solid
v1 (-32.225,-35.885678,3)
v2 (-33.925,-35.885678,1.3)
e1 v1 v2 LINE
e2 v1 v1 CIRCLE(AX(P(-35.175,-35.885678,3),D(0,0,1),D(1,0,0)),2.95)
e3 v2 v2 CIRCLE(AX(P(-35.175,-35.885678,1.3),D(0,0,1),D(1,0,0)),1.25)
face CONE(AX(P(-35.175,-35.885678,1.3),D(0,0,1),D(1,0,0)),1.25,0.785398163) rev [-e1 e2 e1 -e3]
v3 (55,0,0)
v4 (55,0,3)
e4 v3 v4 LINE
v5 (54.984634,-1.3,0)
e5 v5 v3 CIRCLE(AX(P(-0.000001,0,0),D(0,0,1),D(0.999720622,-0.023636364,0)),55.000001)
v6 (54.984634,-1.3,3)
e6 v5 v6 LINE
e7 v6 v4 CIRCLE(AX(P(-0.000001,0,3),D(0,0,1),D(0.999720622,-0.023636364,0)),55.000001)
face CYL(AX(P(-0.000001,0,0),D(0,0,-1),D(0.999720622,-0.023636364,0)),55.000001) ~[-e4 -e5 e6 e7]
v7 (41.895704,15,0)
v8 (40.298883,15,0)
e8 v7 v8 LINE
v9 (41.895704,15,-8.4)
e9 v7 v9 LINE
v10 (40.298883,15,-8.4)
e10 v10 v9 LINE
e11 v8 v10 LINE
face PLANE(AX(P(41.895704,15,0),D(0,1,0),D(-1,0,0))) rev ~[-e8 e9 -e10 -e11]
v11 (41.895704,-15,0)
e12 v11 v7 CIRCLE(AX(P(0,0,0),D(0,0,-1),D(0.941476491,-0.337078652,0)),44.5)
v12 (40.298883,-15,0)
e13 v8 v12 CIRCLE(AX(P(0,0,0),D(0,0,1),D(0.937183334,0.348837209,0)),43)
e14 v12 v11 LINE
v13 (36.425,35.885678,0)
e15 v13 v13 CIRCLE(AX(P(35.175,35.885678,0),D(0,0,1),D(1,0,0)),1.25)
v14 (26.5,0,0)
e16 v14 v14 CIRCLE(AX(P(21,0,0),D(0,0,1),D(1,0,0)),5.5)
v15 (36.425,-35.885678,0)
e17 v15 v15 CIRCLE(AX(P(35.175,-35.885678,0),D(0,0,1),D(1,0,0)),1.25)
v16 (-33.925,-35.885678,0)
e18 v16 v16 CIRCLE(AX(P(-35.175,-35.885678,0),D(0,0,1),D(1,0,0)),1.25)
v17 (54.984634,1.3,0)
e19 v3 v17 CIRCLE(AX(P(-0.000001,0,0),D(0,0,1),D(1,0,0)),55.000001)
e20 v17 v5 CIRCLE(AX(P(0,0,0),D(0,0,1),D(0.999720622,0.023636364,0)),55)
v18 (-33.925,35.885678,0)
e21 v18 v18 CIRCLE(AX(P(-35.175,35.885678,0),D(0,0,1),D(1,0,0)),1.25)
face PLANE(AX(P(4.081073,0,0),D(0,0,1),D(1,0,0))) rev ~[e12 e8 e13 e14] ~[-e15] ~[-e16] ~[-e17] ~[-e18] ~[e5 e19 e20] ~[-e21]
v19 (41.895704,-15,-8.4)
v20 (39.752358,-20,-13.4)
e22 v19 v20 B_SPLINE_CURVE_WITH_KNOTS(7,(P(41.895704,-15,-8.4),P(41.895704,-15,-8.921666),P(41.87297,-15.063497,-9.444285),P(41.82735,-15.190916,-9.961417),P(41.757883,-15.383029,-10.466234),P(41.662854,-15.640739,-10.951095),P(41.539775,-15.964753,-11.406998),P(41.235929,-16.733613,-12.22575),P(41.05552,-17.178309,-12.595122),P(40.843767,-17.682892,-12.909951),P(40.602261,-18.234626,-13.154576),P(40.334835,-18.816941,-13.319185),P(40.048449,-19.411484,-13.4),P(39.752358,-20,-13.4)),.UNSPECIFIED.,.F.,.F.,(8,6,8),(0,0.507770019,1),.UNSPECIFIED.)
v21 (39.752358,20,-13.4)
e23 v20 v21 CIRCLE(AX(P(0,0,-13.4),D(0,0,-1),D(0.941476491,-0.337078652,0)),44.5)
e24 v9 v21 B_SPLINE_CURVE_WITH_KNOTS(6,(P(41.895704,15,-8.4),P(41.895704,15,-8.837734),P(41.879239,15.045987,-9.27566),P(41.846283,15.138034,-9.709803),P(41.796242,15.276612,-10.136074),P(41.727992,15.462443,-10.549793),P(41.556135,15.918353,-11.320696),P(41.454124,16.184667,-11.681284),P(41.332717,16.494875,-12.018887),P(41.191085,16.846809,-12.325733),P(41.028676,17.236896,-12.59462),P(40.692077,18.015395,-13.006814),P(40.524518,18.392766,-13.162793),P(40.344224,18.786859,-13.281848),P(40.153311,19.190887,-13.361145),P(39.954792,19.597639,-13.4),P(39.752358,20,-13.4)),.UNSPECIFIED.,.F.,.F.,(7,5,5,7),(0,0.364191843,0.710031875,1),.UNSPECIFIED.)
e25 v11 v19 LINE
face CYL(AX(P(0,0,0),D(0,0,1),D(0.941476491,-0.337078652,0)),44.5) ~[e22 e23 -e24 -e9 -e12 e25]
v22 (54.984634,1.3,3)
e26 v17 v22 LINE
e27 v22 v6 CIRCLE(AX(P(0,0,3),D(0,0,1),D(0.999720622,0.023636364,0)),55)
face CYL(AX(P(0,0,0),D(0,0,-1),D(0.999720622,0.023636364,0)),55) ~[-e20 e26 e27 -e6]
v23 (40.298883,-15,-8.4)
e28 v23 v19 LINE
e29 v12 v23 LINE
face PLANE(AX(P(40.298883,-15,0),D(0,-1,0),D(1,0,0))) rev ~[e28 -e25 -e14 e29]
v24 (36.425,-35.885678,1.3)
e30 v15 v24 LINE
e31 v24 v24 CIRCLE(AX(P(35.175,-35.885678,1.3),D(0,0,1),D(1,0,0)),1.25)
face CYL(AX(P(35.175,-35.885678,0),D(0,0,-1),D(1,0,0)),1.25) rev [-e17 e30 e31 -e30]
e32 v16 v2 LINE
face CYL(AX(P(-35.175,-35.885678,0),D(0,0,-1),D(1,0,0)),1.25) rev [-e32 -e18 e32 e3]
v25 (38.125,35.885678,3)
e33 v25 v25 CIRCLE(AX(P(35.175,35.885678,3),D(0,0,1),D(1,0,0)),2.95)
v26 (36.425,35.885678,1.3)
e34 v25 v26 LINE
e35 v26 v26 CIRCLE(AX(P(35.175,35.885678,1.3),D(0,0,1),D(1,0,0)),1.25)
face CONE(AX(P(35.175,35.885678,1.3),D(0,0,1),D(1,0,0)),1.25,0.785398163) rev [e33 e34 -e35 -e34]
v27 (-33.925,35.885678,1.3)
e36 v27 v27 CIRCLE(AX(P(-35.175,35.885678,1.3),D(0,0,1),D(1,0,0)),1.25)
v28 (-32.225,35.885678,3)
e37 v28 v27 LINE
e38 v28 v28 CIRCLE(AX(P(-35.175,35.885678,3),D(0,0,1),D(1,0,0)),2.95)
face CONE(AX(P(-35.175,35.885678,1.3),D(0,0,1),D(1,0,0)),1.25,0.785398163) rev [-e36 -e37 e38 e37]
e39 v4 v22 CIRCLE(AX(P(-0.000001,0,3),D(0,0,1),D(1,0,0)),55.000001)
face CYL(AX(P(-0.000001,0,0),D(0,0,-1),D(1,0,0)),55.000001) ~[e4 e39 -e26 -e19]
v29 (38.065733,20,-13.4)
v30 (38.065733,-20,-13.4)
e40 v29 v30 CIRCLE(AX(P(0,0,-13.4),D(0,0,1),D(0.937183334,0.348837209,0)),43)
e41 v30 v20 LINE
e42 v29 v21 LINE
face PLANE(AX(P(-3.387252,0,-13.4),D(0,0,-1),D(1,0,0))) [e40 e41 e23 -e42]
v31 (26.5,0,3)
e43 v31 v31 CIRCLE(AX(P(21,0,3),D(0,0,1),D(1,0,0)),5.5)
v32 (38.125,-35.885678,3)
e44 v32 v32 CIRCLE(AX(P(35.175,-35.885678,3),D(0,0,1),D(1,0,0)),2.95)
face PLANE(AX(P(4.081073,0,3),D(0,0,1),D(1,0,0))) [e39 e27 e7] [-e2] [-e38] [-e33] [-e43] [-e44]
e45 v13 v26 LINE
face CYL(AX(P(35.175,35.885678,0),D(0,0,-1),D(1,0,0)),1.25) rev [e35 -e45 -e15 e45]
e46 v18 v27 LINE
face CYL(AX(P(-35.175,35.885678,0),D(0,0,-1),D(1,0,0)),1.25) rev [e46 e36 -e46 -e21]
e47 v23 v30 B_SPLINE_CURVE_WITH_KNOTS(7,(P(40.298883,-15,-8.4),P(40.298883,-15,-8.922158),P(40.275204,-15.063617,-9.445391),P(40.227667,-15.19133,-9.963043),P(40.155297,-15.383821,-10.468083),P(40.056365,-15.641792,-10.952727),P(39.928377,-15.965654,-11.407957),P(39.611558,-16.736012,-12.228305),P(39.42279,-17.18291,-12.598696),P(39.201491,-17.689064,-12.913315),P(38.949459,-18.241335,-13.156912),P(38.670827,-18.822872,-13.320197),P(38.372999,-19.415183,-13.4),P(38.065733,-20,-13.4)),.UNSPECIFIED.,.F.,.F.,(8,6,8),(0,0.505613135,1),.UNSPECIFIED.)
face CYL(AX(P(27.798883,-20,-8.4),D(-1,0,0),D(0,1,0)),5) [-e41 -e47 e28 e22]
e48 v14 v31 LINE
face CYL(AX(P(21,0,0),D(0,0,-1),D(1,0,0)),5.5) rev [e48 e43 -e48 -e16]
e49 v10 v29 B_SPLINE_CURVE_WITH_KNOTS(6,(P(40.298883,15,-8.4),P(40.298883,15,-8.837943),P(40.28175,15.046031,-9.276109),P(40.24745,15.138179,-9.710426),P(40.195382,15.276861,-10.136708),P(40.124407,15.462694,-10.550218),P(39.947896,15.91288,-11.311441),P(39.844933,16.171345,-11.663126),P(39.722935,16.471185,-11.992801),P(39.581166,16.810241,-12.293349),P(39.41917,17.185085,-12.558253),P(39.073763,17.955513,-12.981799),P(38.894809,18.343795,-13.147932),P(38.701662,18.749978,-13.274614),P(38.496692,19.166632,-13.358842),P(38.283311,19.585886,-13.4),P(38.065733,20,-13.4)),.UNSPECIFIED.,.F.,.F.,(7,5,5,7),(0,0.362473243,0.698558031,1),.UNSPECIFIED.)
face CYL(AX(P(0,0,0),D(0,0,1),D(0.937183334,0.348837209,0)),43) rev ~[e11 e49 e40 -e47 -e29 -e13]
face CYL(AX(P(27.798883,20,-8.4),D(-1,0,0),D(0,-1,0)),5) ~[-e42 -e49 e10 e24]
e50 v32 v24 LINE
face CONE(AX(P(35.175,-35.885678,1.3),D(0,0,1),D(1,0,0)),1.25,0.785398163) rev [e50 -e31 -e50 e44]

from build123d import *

# Parameters (mm, degrees)
F0_R        = 1.25
F0_R_2      = 5.5
F1_DEPTH    = 3
F3_DEPTH    = 13.4
F4_T1_DEPTH = 26.5968204778
F5_SIZE     = 1.7


# Not quite as in the source:
# - a fillet or chamfer that OpenCascade refuses, or shapes differently, is made with other operations: its cross-section is extruded or revolved along the edge and cut away or added
# - a feature names something its author has since deleted; it is built from what else it names


with BuildPart() as f1:
    # F0 (on Top) → F1 (new body)
    with BuildSketch(Plane.XY):
        with BuildLine():
            ThreePointArc((45.3208194724, 4.0340206186), (-45.5, 0), (45.3208194724, -4.0340206186))
            ThreePointArc((45.3208194724, -4.0340206186), (46.2839051451, -2.086638513), (48.3090053717, -1.3))
            Line((48.3090053717, -1.3), (54.9846342172, -1.3))
            ThreePointArc((54.9846342172, -1.3), (54.9961584201, -0.6500454037), (55, 0))
            ThreePointArc((55, 0), (54.9961584201, 0.6500454037), (54.9846342172, 1.3))
            Line((54.9846342172, 1.3), (48.3090053717, 1.3))
            ThreePointArc((48.3090053717, 1.3), (46.2839051451, 2.086638513), (45.3208194724, 4.0340206186))
        make_face()
        with BuildLine():
            Line((39.2652518138, 1.3), (32, 1.3))
            Line((32, 1.3), (32, 0))
            Line((32, 0), (32, -1.3))
            Line((32, -1.3), (39.2652518138, -1.3))
            ThreePointArc((39.2652518138, -1.3), (41.499054271, -2.2974699547), (42.2474228376, -4.6265822785))
            ThreePointArc((42.2474228376, -4.6265822785), (-42.5, 0), (42.2474228376, 4.6265822785))
            ThreePointArc((42.2474228376, 4.6265822785), (41.499054271, 2.2974699547), (39.2652518138, 1.3))
        make_face(mode=Mode.SUBTRACT)
        with BuildLine():
            Line((32, 15), (32, 1.3))
            Line((32, 1.3), (39.2652518138, 1.3))
            ThreePointArc((39.2652518138, 1.3), (41.499054271, 2.2974699547), (42.2474228376, 4.6265822785))
            ThreePointArc((42.2474228376, 4.6265822785), (-42.5, 0), (42.2474228376, -4.6265822785))
            ThreePointArc((42.2474228376, -4.6265822785), (41.499054271, -2.2974699547), (39.2652518138, -1.3))
            Line((39.2652518138, -1.3), (32, -1.3))
            Line((32, -1.3), (32, -15))
            Line((32, -15), (21.575, -15))
            Line((21.575, -15), (21.575, -17.3))
            ThreePointArc((21.575, -17.3), (17.075, -21.8), (12.575, -17.3))
            Line((12.575, -17.3), (12.575, -15))
            Line((12.575, -15), (-12.575, -15))
            Line((-12.575, -15), (-12.575, -17.3))
            ThreePointArc((-12.575, -17.3), (-17.075, -21.8), (-21.575, -17.3))
            Line((-21.575, -17.3), (-21.575, -15))
            Line((-21.575, -15), (-32, -15))
            Line((-32, -15), (-32, 15))
            Line((-32, 15), (-21.575, 15))
            Line((-21.575, 15), (-21.575, 17.3))
            ThreePointArc((-21.575, 17.3), (-17.075, 21.8), (-12.575, 17.3))
            Line((-12.575, 17.3), (-12.575, 15))
            Line((-12.575, 15), (12.575, 15))
            Line((12.575, 15), (12.575, 17.3))
            ThreePointArc((12.575, 17.3), (17.075, 21.8), (21.575, 17.3))
            Line((21.575, 17.3), (21.575, 15))
            Line((21.575, 15), (32, 15))
        make_face()
        with BuildLine():
            ThreePointArc((48.3090053717, -1.3), (46.2839051451, -2.086638513), (45.3208194724, -4.0340206186))
            ThreePointArc((45.3208194724, -4.0340206186), (-45.5, 0), (45.3208194724, 4.0340206186))
            ThreePointArc((45.3208194724, 4.0340206186), (46.2839051451, 2.086638513), (48.3090053717, 1.3))
            Line((48.3090053717, 1.3), (54.9846342172, 1.3))
            ThreePointArc((54.9846342172, 1.3), (-55, 0), (54.9846342172, -1.3))
            Line((54.9846342172, -1.3), (48.3090053717, -1.3))
        make_face()
        with Locations((-35.175, -35.8856778534)):
            Circle(F0_R, mode=Mode.SUBTRACT)
        with Locations((35.175, -35.8856778534)):
            Circle(F0_R, mode=Mode.SUBTRACT)
        with Locations((-35.175, 35.8856778534)):
            Circle(F0_R, mode=Mode.SUBTRACT)
        with Locations((35.175, 35.8856778534)):
            Circle(F0_R, mode=Mode.SUBTRACT)
        with BuildLine():
            Line((32, 0), (32, 1.3))
            Line((32, 1.3), (32, 15))
            Line((32, 15), (21.575, 15))
            Line((21.575, 15), (21.575, 17.3))
            ThreePointArc((21.575, 17.3), (17.075, 21.8), (12.575, 17.3))
            Line((12.575, 17.3), (12.575, 15))
            Line((12.575, 15), (-12.575, 15))
            Line((-12.575, 15), (-12.575, 17.3))
            ThreePointArc((-12.575, 17.3), (-17.075, 21.8), (-21.575, 17.3))
            Line((-21.575, 17.3), (-21.575, 15))
            Line((-21.575, 15), (-32, 15))
            Line((-32, 15), (-32, -15))
            Line((-32, -15), (-21.575, -15))
            Line((-21.575, -15), (-21.575, -17.3))
            ThreePointArc((-21.575, -17.3), (-17.075, -21.8), (-12.575, -17.3))
            Line((-12.575, -17.3), (-12.575, -15))
            Line((-12.575, -15), (12.575, -15))
            Line((12.575, -15), (12.575, -17.3))
            ThreePointArc((12.575, -17.3), (17.075, -21.8), (21.575, -17.3))
            Line((21.575, -17.3), (21.575, -15))
            Line((21.575, -15), (32, -15))
            Line((32, -15), (32, -1.3))
            Line((32, -1.3), (32, 0))
        make_face()
        with Locations((21, 0)):
            Circle(F0_R_2, mode=Mode.SUBTRACT)
    extrude(amount=F1_DEPTH)

    # F2 (on face) → F3 (join)
    with BuildSketch(Plane(origin=(0, 0, 0), x_dir=(1, 0, 0), z_dir=(0, 0, -1))):
        with BuildLine():
            Line((40.2988833592, 15), (41.895703837, 15))
            ThreePointArc((41.895703837, 15), (-44.5, 0), (41.895703837, -15))
            Line((41.895703837, -15), (40.2988833592, -15))
            ThreePointArc((40.2988833592, -15), (-43, 0), (40.2988833592, 15))
        make_face()
    extrude(amount=F3_DEPTH)

    # F4: fillet of radius 5 on 2 edges, made by hand

    # F4_s2 → F4_t1 (cut)
    with BuildSketch(Plane.YZ.offset(27.7988833592)):
        with BuildLine():
            ThreePointArc((-15, -8.4), (-16.4644660941, -11.9355339059), (-20, -13.4))
            Line((-20, -13.4), (-15, -13.4))
            Line((-15, -13.4), (-15, -8.4))
        make_face()
        with BuildLine():
            ThreePointArc((15, -8.4), (16.4644660941, -11.9355339059), (20, -13.4))
            Line((20, -13.4), (15, -13.4))
            Line((15, -13.4), (15, -8.4))
        make_face()
    extrude(amount=F4_T1_DEPTH, mode=Mode.SUBTRACT)

    # F5
    f5_edges = [f1.edges().sort_by_distance(p)[0] for p in [
        (-36.425, 35.885678, 3),
        (-36.425, -35.885678, 3),
        (33.925, -35.885678, 3),
        (33.925, 35.885678, 3),
    ]]
    chamfer(f5_edges, length=F5_SIZE)


solid = f1.part
